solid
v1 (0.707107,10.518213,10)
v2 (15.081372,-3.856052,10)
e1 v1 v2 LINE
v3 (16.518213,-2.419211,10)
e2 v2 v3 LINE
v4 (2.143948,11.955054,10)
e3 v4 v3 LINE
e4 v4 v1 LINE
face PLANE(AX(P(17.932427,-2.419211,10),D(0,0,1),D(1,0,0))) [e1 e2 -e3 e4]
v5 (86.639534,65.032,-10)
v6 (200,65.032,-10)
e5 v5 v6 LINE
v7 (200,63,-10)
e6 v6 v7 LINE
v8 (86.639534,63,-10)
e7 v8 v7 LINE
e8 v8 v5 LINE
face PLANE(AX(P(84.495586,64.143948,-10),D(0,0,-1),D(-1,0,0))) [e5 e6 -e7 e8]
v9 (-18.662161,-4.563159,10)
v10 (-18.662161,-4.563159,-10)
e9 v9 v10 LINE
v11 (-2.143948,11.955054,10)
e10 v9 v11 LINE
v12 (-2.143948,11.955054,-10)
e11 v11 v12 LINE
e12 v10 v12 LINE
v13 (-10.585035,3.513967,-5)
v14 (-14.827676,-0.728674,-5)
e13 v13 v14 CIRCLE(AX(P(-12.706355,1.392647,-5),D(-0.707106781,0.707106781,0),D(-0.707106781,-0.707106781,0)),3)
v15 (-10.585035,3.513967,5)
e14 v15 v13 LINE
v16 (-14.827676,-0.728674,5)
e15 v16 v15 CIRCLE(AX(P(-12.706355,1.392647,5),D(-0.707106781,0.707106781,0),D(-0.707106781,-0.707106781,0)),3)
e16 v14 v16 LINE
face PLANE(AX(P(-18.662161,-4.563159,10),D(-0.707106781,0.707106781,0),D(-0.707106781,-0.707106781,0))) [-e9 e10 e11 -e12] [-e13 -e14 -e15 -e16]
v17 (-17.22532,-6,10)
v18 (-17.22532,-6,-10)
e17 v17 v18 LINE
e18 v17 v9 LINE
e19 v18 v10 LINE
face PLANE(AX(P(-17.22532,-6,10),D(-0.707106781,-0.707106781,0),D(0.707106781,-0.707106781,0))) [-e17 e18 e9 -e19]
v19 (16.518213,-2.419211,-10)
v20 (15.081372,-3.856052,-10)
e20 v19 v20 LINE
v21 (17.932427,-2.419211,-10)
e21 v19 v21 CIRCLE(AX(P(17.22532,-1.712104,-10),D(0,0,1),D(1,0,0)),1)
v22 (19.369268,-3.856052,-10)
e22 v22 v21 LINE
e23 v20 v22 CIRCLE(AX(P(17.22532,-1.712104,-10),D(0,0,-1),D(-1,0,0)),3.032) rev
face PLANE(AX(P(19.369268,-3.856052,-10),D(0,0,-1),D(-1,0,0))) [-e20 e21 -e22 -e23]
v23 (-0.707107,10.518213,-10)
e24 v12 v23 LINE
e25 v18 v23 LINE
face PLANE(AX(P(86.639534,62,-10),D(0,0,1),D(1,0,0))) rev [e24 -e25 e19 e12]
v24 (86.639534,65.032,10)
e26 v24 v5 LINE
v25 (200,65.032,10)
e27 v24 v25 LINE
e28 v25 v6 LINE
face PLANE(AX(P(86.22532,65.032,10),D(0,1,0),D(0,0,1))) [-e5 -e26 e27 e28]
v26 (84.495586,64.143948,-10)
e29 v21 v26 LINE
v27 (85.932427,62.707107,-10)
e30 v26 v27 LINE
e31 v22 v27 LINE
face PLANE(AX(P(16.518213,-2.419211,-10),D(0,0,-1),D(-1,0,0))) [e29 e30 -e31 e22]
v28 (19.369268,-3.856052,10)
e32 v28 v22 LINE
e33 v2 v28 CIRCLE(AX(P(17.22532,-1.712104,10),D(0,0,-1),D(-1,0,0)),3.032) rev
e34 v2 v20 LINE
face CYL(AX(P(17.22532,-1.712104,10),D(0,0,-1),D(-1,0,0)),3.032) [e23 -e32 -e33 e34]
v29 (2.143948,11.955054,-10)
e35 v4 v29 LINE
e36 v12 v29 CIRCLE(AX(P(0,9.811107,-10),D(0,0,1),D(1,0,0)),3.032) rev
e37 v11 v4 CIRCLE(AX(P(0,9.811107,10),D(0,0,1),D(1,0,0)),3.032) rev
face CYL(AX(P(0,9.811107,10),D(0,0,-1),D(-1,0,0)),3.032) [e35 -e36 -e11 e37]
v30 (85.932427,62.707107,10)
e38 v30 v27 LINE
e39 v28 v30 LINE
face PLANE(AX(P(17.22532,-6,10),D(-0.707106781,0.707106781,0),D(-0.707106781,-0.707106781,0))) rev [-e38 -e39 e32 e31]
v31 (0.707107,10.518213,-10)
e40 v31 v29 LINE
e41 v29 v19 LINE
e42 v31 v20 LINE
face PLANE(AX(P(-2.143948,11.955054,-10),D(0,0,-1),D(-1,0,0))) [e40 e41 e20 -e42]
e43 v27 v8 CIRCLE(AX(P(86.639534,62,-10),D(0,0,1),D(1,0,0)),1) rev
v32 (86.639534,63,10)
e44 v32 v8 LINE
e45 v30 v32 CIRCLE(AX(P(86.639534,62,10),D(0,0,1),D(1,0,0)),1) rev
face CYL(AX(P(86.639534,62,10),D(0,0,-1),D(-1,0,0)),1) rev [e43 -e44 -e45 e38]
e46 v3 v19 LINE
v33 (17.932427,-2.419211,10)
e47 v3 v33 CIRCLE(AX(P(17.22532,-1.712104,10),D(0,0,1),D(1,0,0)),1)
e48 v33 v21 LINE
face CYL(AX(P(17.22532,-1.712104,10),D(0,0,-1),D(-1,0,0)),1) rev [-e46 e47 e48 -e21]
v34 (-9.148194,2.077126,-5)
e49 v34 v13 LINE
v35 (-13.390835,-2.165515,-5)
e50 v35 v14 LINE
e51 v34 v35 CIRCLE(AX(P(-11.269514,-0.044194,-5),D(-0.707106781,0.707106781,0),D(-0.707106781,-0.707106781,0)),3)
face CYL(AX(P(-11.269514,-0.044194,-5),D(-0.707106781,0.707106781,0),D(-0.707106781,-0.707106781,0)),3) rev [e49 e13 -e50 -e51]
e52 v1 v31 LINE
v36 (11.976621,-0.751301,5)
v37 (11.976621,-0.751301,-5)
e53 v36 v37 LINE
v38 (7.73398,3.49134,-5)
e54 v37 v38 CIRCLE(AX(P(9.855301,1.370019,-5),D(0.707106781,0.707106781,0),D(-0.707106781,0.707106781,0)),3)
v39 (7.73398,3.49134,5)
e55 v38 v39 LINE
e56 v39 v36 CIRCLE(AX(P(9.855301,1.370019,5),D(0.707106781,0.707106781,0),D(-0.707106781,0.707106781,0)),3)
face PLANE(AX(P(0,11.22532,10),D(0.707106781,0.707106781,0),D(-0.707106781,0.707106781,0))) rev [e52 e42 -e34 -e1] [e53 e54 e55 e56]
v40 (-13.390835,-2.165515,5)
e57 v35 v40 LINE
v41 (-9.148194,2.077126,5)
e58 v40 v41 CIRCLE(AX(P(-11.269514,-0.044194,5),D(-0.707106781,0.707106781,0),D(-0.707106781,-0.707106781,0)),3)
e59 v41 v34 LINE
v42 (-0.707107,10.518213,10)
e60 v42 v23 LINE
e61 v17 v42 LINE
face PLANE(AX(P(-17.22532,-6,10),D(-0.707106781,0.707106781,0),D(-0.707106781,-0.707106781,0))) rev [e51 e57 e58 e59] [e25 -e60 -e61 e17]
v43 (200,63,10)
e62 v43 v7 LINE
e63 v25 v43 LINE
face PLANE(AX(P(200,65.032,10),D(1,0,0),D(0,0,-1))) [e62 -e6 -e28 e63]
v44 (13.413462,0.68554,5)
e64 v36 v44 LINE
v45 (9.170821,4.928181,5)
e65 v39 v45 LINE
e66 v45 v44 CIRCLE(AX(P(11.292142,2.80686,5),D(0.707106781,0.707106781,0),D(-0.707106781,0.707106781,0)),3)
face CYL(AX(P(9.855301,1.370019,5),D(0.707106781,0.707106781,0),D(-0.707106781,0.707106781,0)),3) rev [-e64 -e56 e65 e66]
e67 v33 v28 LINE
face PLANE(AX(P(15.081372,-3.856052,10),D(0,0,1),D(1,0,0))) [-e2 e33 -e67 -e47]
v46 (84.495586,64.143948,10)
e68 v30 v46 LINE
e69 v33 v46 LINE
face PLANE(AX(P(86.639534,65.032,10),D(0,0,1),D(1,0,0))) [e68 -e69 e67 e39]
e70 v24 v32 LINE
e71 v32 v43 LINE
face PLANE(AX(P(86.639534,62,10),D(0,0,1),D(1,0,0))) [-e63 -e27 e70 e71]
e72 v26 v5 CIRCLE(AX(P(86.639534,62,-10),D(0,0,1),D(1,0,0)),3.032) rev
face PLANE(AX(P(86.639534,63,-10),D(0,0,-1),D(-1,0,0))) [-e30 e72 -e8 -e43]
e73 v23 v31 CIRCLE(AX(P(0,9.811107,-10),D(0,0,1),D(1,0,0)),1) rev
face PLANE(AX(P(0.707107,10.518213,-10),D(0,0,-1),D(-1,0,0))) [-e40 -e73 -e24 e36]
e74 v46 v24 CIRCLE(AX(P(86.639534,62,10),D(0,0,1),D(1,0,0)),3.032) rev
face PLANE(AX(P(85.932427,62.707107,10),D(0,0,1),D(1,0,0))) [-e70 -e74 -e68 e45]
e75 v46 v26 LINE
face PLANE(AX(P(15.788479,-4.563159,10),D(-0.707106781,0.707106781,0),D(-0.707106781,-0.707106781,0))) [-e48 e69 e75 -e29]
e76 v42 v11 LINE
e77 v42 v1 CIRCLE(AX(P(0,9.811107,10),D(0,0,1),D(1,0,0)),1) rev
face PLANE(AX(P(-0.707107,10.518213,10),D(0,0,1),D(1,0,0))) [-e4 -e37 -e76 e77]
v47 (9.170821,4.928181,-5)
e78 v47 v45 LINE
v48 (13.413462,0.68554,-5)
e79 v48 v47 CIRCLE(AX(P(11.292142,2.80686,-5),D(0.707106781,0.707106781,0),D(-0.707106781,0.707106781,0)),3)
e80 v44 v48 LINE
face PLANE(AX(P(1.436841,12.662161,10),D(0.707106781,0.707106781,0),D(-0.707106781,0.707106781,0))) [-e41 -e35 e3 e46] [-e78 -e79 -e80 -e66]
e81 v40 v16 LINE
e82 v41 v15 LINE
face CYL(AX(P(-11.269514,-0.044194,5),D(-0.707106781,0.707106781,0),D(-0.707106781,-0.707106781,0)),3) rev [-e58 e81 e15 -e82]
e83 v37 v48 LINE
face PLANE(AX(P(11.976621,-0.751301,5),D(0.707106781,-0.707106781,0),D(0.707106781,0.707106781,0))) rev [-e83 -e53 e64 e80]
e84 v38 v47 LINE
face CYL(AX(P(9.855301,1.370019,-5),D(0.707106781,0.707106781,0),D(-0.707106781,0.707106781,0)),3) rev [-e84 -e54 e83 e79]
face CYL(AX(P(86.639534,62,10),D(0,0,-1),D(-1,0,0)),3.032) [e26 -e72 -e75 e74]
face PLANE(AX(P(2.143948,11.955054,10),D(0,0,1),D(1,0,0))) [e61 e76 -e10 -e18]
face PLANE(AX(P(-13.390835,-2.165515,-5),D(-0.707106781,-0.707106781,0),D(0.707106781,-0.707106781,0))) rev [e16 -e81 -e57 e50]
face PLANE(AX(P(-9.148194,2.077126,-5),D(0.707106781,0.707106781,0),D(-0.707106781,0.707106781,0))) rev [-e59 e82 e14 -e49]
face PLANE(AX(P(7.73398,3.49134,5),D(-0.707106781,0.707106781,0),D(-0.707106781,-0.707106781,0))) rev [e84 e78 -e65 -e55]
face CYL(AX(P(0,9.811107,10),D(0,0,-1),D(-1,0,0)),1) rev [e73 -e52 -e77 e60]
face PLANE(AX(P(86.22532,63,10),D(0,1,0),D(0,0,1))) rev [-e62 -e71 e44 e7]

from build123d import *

# Parameters (mm, degrees)
BASE_FLANGE1_DEPTH = 10
CUT_EXTRUDE1_DEPTH = 2.032
CUT_EXTRUDE2_DEPTH = 2.032


# Sheet-metal steps are written as plain solids
with BuildPart() as part:
    # Sketch1 → Base-Flange1 (new, symmetric)
    with BuildSketch(Plane.XY):
        with BuildLine():
            Line((-17.225320151, -6), (-0.707106781, 10.51821337))
            ThreePointArc((-0.707106781, 10.51821337), (0, 10.811106589), (0.707106781, 10.51821337))
            Line((0.707106781, 10.51821337), (15.081372391, -3.856052239))
            ThreePointArc((15.081372391, -3.856052239), (17.225320151, -4.744104479), (19.369267912, -3.856052239))
            Line((19.369267912, -3.856052239), (85.932426933, 62.707106781))
            ThreePointArc((85.932426933, 62.707106781), (86.256850281, 62.923879533), (86.639533714, 63))
            Line((86.639533714, 63), (200, 63))
            Line((200, 63), (200, 65.032))
            Line((200, 65.032), (86.639533714, 65.032))
            ThreePointArc((86.639533714, 65.032), (85.479237547, 64.801202743), (84.495585953, 64.143947761))
            Line((84.495585953, 64.143947761), (17.932426933, -2.41921126))
            ThreePointArc((17.932426933, -2.41921126), (17.225320151, -2.712104479), (16.51821337, -2.41921126))
            Line((16.51821337, -2.41921126), (2.143947761, 11.95505435))
            ThreePointArc((2.143947761, 11.95505435), (0, 12.843106589), (-2.143947761, 11.95505435))
            Line((-2.143947761, 11.95505435), (-18.662161131, -4.563159021))
            Line((-18.662161131, -4.563159021), (-17.225320151, -6))
        make_face()
    extrude(amount=BASE_FLANGE1_DEPTH, both=True)

    # Sketch6 → Cut-Extrude1 (cut)
    with BuildSketch(Plane(origin=(-7.049501055, 7.049501055, 0), x_dir=(0, 0, 1), z_dir=(-0.7071067811865488, 0.7071067811865464, 0))):
        with BuildLine():
            Line((-5, -5), (5, -5))
            ThreePointArc((5, -5), (8, -8), (5, -11))
            Line((5, -11), (-5, -11))
            ThreePointArc((-5, -11), (-8, -8), (-5, -5))
        make_face()
    extrude(amount=-CUT_EXTRUDE1_DEPTH, mode=Mode.SUBTRACT)

    # Sketch9 → Cut-Extrude2 (cut)
    with BuildSketch(Plane(origin=(7.049501055, 7.049501055, 0), x_dir=(0, 0, -1), z_dir=(0.7071067811865488, 0.7071067811865464, 0))):
        with BuildLine():
            Line((-5, -3), (5, -3))
            ThreePointArc((5, -3), (8, -6), (5, -9))
            Line((5, -9), (-5, -9))
            ThreePointArc((-5, -9), (-8, -6), (-5, -3))
        make_face()
    extrude(amount=-CUT_EXTRUDE2_DEPTH, mode=Mode.SUBTRACT)


solid = part.part
